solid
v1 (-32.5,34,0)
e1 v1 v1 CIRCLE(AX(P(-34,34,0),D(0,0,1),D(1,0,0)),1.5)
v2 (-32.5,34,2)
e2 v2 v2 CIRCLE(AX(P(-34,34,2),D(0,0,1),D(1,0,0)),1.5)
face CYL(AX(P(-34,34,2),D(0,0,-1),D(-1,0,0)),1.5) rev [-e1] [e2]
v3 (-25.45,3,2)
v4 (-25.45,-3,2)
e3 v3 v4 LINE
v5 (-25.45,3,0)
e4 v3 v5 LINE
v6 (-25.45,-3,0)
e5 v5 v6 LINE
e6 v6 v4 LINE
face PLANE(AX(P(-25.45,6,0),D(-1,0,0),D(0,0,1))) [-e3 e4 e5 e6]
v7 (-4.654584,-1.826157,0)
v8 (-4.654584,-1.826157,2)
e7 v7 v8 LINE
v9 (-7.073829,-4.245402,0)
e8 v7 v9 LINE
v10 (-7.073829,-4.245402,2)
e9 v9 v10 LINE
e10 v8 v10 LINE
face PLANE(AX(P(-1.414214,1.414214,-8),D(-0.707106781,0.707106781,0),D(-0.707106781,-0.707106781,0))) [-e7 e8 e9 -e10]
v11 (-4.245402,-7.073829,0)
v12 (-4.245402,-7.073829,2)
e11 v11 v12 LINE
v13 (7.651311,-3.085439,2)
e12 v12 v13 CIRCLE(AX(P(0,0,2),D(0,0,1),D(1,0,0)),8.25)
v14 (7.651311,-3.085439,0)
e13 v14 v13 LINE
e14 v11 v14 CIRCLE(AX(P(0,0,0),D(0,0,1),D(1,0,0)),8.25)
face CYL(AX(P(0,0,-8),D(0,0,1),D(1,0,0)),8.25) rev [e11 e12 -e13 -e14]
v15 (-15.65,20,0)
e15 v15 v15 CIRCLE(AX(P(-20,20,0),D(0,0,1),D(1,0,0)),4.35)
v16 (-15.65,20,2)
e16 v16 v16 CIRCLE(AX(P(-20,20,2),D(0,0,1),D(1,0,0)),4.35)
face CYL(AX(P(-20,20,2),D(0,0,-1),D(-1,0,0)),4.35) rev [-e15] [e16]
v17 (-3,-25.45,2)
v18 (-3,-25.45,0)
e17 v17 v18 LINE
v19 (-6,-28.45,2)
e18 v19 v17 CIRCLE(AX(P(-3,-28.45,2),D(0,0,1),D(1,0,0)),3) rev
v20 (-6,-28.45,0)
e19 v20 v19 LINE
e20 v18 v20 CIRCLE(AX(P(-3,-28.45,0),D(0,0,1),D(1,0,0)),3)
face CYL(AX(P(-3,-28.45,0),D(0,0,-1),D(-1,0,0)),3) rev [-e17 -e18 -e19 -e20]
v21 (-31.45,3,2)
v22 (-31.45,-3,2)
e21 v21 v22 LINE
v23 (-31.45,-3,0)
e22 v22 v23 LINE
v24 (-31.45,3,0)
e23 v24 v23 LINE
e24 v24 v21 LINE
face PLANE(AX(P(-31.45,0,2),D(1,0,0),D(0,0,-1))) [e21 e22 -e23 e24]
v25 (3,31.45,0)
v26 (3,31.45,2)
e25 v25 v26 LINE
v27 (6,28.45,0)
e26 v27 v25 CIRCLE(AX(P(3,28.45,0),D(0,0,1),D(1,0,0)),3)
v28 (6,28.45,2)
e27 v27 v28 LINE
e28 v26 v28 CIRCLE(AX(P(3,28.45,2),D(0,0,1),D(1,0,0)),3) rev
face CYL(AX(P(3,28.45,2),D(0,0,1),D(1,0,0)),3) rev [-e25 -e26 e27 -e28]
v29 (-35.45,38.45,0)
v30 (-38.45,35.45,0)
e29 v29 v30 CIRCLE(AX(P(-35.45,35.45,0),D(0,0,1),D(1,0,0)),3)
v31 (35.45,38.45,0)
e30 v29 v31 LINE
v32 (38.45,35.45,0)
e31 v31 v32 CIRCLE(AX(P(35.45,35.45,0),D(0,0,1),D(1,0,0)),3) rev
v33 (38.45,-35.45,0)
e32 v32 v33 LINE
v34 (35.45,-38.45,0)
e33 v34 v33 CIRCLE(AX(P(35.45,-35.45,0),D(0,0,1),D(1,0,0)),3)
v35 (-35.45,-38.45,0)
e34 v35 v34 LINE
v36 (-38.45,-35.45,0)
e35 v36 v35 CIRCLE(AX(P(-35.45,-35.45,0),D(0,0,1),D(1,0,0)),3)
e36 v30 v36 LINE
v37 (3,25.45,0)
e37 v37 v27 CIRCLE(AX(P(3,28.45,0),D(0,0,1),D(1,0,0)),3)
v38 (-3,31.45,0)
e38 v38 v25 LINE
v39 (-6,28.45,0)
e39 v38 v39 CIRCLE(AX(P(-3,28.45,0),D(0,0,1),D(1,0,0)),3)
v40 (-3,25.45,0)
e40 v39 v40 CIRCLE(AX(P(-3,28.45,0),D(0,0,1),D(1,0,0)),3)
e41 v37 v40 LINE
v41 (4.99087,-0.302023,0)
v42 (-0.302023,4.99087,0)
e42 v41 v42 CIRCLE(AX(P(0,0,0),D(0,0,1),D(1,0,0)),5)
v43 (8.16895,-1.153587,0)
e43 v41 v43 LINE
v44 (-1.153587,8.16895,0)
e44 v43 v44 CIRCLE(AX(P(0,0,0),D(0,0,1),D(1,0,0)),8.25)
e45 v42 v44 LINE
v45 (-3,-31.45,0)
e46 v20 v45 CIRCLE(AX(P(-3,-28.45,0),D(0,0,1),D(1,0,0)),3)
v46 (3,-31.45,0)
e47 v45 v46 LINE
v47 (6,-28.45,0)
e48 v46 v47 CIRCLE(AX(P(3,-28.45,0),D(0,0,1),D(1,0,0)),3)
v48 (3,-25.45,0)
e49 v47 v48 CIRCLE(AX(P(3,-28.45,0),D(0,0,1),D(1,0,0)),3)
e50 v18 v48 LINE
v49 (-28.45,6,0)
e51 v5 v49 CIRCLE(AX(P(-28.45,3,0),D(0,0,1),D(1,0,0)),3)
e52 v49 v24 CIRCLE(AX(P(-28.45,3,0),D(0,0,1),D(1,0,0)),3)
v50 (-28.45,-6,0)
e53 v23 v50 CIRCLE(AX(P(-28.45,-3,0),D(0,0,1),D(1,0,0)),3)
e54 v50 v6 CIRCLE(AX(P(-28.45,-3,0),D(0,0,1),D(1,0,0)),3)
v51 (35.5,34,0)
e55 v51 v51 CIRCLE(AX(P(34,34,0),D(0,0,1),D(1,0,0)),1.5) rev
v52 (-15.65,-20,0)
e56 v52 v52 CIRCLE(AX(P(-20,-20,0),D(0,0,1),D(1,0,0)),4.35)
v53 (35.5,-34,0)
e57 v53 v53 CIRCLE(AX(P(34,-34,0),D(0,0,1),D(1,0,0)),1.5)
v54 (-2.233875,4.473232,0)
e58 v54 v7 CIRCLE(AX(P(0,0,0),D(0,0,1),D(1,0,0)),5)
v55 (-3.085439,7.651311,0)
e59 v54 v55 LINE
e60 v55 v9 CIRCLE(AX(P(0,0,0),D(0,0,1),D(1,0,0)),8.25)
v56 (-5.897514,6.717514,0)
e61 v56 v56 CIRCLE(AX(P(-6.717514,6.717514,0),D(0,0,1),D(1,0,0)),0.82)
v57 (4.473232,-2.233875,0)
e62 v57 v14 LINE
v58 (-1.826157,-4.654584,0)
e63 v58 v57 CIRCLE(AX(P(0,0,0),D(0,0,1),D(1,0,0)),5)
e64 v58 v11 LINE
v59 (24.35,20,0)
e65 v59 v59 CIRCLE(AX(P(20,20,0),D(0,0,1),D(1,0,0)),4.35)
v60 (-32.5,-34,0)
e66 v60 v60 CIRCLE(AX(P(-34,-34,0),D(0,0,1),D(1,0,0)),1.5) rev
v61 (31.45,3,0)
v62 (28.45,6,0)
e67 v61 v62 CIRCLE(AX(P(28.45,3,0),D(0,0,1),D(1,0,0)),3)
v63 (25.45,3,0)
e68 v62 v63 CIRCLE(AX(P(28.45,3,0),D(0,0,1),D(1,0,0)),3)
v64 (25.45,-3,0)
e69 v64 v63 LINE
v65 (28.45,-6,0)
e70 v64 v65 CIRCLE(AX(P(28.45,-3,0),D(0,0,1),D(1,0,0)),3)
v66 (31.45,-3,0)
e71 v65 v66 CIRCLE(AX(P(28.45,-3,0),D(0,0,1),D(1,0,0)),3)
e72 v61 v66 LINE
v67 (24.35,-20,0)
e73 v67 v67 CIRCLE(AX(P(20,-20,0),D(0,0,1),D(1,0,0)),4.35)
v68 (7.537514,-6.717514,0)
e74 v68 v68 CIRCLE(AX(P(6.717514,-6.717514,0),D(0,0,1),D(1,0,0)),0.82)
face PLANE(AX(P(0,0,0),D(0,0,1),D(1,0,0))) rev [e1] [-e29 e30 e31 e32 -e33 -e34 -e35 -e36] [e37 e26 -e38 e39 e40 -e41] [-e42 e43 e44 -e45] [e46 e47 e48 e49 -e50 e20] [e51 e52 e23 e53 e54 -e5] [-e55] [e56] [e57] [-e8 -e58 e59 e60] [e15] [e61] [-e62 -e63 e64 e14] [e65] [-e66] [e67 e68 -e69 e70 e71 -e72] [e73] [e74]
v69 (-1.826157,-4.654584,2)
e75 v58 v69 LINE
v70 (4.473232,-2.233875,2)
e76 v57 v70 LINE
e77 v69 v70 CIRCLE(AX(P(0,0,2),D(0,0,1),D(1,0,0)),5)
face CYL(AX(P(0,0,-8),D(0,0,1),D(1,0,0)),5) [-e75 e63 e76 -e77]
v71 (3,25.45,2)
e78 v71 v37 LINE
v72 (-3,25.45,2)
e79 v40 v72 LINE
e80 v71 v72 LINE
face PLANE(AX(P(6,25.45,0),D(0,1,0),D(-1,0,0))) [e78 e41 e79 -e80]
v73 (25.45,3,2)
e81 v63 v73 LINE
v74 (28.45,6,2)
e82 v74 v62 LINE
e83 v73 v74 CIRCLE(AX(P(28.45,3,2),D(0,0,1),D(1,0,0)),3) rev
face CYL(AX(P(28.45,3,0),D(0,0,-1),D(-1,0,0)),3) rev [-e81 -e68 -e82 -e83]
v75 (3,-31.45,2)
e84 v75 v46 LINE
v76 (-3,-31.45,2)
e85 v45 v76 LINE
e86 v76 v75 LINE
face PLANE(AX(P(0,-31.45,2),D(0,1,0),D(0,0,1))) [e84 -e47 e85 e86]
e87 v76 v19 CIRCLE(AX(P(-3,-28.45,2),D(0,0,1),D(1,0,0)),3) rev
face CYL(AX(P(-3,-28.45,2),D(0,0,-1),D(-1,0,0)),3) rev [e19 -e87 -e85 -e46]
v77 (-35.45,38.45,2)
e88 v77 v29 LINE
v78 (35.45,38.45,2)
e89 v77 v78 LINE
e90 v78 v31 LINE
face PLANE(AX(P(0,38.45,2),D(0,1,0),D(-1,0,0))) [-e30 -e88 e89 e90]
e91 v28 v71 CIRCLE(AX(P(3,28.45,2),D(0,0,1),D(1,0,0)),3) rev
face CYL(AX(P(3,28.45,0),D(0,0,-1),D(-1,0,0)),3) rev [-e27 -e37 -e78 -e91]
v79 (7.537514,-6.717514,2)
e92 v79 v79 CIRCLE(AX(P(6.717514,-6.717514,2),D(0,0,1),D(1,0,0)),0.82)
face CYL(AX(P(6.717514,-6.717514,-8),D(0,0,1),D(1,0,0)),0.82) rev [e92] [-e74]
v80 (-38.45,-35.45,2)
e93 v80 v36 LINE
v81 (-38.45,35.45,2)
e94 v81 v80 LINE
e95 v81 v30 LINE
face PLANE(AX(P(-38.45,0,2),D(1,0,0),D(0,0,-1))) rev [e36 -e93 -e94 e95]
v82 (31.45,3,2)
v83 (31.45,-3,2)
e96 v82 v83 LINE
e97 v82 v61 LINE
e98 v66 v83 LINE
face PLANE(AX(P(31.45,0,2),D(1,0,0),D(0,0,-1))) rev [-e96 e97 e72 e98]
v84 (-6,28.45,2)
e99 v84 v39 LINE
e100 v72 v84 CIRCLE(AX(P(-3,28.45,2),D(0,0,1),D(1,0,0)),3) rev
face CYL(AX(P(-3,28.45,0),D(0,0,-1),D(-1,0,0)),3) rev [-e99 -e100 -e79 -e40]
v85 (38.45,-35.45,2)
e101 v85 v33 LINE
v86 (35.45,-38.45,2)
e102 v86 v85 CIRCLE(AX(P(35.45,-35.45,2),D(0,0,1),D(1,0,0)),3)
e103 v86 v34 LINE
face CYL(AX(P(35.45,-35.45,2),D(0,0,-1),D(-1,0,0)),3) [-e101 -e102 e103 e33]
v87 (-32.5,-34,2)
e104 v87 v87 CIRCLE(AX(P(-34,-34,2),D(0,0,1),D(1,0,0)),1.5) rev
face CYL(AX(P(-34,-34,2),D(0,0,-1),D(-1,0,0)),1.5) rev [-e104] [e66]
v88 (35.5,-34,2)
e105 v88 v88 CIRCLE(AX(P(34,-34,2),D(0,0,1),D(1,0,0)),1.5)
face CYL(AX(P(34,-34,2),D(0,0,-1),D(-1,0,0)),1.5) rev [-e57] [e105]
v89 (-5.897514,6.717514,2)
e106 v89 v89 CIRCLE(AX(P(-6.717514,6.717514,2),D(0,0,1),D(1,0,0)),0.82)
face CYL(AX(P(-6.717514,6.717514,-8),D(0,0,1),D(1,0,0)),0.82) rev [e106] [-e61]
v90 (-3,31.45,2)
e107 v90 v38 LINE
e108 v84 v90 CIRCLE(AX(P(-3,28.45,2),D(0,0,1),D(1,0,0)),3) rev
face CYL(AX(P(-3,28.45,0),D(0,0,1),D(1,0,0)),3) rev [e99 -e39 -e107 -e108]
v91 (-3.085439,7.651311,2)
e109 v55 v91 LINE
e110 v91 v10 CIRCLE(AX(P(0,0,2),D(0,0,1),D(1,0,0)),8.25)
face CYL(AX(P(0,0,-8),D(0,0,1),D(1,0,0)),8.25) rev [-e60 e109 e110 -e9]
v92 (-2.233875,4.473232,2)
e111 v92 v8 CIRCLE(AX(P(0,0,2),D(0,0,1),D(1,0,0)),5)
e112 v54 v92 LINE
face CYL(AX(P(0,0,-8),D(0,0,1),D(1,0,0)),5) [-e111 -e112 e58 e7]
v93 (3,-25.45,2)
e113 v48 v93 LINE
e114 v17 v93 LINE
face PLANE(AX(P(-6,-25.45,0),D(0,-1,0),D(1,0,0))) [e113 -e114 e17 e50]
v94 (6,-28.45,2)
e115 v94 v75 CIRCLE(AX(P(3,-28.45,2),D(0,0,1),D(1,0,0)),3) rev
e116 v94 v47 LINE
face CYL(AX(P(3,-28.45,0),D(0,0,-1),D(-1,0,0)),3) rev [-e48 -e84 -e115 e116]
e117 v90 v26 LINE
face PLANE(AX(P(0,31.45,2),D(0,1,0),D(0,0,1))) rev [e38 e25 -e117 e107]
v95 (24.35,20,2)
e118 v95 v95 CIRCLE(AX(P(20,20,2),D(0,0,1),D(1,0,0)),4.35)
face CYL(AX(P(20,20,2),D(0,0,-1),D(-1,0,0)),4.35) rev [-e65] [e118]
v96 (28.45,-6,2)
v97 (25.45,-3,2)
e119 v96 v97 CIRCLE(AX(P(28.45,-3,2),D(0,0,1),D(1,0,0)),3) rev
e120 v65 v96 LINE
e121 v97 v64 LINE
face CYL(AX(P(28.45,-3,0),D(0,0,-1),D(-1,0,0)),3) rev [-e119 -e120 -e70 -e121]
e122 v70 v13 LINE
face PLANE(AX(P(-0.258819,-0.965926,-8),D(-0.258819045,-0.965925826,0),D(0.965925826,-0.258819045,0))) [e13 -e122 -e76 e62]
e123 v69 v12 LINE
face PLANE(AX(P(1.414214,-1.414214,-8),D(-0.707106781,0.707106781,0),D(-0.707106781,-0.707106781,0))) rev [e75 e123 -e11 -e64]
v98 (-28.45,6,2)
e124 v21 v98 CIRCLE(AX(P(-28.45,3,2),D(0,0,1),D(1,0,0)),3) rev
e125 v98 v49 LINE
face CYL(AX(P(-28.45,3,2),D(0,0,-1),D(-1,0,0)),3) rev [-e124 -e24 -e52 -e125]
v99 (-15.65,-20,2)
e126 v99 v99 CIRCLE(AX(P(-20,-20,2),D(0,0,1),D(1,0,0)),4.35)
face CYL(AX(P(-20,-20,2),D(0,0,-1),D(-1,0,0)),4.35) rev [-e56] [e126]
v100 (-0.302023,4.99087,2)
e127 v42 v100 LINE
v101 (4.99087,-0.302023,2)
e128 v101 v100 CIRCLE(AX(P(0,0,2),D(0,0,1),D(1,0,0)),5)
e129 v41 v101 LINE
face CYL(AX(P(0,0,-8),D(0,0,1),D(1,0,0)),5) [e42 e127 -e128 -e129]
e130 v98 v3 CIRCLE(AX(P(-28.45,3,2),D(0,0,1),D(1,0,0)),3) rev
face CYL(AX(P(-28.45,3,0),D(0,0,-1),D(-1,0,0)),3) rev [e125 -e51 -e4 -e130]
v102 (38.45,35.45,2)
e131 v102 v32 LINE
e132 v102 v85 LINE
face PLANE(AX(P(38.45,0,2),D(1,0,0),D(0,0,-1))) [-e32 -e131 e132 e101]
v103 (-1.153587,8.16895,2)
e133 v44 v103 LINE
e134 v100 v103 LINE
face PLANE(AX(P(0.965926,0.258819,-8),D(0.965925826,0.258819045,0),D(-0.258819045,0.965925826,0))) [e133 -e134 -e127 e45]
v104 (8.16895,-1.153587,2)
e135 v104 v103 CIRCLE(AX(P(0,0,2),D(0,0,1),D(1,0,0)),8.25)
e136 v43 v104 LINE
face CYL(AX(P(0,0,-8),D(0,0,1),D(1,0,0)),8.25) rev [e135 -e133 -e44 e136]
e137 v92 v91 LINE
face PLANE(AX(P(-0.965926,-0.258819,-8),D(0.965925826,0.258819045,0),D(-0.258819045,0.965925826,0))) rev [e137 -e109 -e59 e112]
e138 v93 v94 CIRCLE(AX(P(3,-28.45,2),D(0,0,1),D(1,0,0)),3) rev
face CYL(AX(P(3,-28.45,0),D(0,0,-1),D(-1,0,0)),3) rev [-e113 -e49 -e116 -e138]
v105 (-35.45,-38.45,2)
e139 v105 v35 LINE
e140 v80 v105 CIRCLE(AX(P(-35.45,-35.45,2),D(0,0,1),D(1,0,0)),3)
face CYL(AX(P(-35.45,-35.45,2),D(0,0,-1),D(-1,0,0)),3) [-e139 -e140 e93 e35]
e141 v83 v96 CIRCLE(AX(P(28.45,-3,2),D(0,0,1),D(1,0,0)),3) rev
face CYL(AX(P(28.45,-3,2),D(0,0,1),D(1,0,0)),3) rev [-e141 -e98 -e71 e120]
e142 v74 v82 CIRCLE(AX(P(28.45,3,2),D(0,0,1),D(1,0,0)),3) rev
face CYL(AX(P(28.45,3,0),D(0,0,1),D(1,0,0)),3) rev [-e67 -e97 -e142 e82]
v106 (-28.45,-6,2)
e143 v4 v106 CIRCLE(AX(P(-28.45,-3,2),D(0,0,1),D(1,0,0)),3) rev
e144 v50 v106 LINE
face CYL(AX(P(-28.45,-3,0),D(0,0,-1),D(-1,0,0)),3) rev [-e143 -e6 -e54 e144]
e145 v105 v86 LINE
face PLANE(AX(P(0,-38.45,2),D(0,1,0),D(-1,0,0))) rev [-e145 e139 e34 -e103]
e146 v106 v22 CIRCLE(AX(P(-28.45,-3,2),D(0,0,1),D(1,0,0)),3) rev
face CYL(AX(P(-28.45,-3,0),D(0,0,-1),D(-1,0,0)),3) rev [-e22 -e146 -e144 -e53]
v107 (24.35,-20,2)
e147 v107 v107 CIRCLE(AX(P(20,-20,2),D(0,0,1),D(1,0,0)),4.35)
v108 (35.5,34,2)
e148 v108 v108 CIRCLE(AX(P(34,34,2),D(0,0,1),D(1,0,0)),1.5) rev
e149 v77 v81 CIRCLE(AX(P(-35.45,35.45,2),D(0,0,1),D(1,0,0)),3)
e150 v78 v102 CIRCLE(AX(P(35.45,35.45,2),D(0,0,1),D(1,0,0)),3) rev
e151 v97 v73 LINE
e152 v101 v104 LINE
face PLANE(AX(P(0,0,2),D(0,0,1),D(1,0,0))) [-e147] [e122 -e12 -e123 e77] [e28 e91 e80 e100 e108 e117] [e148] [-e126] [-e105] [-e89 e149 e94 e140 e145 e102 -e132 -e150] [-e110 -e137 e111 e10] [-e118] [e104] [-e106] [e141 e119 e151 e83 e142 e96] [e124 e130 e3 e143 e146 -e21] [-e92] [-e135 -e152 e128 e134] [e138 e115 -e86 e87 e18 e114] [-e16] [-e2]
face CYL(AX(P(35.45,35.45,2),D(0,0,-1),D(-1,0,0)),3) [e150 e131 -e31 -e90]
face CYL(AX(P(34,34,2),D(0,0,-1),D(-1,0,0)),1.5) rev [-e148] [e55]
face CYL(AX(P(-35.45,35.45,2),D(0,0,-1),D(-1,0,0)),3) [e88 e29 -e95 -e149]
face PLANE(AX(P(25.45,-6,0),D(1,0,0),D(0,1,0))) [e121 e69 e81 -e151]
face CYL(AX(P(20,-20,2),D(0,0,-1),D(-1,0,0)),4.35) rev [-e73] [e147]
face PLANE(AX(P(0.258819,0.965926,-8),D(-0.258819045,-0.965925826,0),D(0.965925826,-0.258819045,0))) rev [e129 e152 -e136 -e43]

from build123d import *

# Parameters (mm, degrees)
SKETCH_1_R          = 1.5
SKETCH_1_R_2        = 4.35
EXTRUDE_1_DEPTH     = 2
SKETCH_3_R          = 0.82
CUT_EXTRUDE_2_DEPTH = 10
EXTRUDE_START       = -2
EXTRUDE_2_DEPTH     = 2
FILLET_1_R          = 3


with BuildPart() as part:
    # 草圖1 → 填料-伸長1 (new body)
    with BuildSketch(Plane.XY):
        with BuildLine():
            Line((-35.45, 38.45), (35.45, 38.45))
            ThreePointArc((35.45, 38.45), (37.571320344, 37.571320344), (38.45, 35.45))
            Line((38.45, 35.45), (38.45, -35.45))
            ThreePointArc((38.45, -35.45), (37.571320344, -37.571320344), (35.45, -38.45))
            Line((35.45, -38.45), (-35.45, -38.45))
            ThreePointArc((-35.45, -38.45), (-37.571320344, -37.571320344), (-38.45, -35.45))
            Line((-38.45, -35.45), (-38.45, 35.45))
            ThreePointArc((-38.45, 35.45), (-37.571320344, 37.571320344), (-35.45, 38.45))
        make_face()
        with Locations((-34, 34)):
            Circle(SKETCH_1_R, mode=Mode.SUBTRACT)
        with Locations((34, 34)):
            Circle(SKETCH_1_R, mode=Mode.SUBTRACT)
        with Locations((34, -34)):
            Circle(SKETCH_1_R, mode=Mode.SUBTRACT)
        with Locations((-34, -34)):
            Circle(SKETCH_1_R, mode=Mode.SUBTRACT)
        with Locations((-20, 20)):
            Circle(SKETCH_1_R_2, mode=Mode.SUBTRACT)
        with Locations((20, 20)):
            Circle(SKETCH_1_R_2, mode=Mode.SUBTRACT)
        with Locations((-20, -20)):
            Circle(SKETCH_1_R_2, mode=Mode.SUBTRACT)
        with Locations((20, -20)):
            Circle(SKETCH_1_R_2, mode=Mode.SUBTRACT)
        with BuildLine():
            Line((-18.5, 31.45), (18.5, 31.45))
            Line((18.5, 31.45), (18.5, 26.837397166))
            ThreePointArc((18.5, 26.837397166), (15.050252532, 24.949747468), (13.162602834, 21.5))
            Line((13.162602834, 21.5), (-13.162602834, 21.5))
            ThreePointArc((-13.162602834, 21.5), (-15.050252532, 24.949747468), (-18.5, 26.837397166))
            Line((-18.5, 26.837397166), (-18.5, 31.45))
        make_face(mode=Mode.SUBTRACT)
        with BuildLine():
            Line((-31.45, 18.5), (-31.45, -18.5))
            Line((-31.45, -18.5), (-26.837397166, -18.5))
            ThreePointArc((-26.837397166, -18.5), (-24.949747468, -15.050252532), (-21.5, -13.162602834))
            Line((-21.5, -13.162602834), (-21.5, 13.162602834))
            ThreePointArc((-21.5, 13.162602834), (-24.949747468, 15.050252532), (-26.837397166, 18.5))
            Line((-26.837397166, 18.5), (-31.45, 18.5))
        make_face(mode=Mode.SUBTRACT)
        with BuildLine():
            Line((26.837397166, 18.5), (31.45, 18.5))
            Line((31.45, 18.5), (31.45, -18.5))
            Line((31.45, -18.5), (26.837397166, -18.5))
            ThreePointArc((26.837397166, -18.5), (24.949747468, -15.050252532), (21.5, -13.162602834))
            Line((21.5, -13.162602834), (21.5, 13.162602834))
            ThreePointArc((21.5, 13.162602834), (24.949747468, 15.050252532), (26.837397166, 18.5))
        make_face(mode=Mode.SUBTRACT)
        with BuildLine():
            Line((-18.5, -31.45), (-18.5, -26.837397166))
            ThreePointArc((-18.5, -26.837397166), (-15.050252532, -24.949747468), (-13.162602834, -21.5))
            Line((-13.162602834, -21.5), (13.162602834, -21.5))
            ThreePointArc((13.162602834, -21.5), (15.050252532, -24.949747468), (18.5, -26.837397166))
            Line((18.5, -26.837397166), (18.5, -31.45))
            Line((18.5, -31.45), (-18.5, -31.45))
        make_face(mode=Mode.SUBTRACT)
    extrude(amount=EXTRUDE_1_DEPTH)

    # 草圖3 → 除料-伸長2 (cut)
    with BuildSketch(Plane.XY.offset(2)):
        with BuildLine():
            Line((-7.073829274, -4.245402149), (-4.654583912, -1.826156787))
            ThreePointArc((-4.654583912, -1.826156787), (-4.667257292, 1.793518711), (-2.233875019, 4.473231762))
            Line((-2.233875019, 4.473231762), (-3.085438902, 7.651311442))
            ThreePointArc((-3.085438902, 7.651311442), (-7.822124458, 2.622378494), (-7.073829274, -4.245402149))
        make_face()
        with BuildLine():
            Line((-1.15358725, 8.168949532), (-0.302023366, 4.990869853))
            ThreePointArc((-0.302023366, 4.990869853), (3.427089375, 3.640749705), (5, 0))
            ThreePointArc((5, 0), (4.997716942, -0.151080668), (4.990869853, -0.302023366))
            Line((4.990869853, -0.302023366), (8.168949532, -1.15358725))
            ThreePointArc((8.168949532, -1.15358725), (8.229712438, -0.578215514), (8.25, 0))
            ThreePointArc((8.25, 0), (5.410425362, 6.228145583), (-1.15358725, 8.168949532))
        make_face()
        with BuildLine():
            ThreePointArc((4.473231762, -2.233875019), (1.793518711, -4.667257292), (-1.826156787, -4.654583912))
            Line((-1.826156787, -4.654583912), (-4.245402149, -7.073829274))
            ThreePointArc((-4.245402149, -7.073829274), (2.622378494, -7.822124458), (7.651311442, -3.085438902))
            Line((7.651311442, -3.085438902), (4.473231762, -2.233875019))
        make_face()
        with Locations((6.717514421, -6.717514421)):
            Circle(SKETCH_3_R)
        with Locations((-6.717514421, 6.717514421)):
            Circle(SKETCH_3_R)
    extrude(amount=-CUT_EXTRUDE_2_DEPTH, mode=Mode.SUBTRACT)

    # 草圖4 → 填料-伸長2 (add)
    with BuildSketch(Plane.XY.offset(2).offset(EXTRUDE_START)):
        with BuildLine():
            Line((-31.45, -6), (-31.45, -18.5))
            Line((-31.45, -18.5), (-26.837397166, -18.5))
            ThreePointArc((-26.837397166, -18.5), (-24.949747468, -15.050252532), (-21.5, -13.162602834))
            Line((-21.5, -13.162602834), (-21.5, 13.162602834))
            ThreePointArc((-21.5, 13.162602834), (-24.949747468, 15.050252532), (-26.837397166, 18.5))
            Line((-26.837397166, 18.5), (-31.45, 18.5))
            Line((-31.45, 18.5), (-31.45, 6))
            Line((-31.45, 6), (-25.45, 6))
            Line((-25.45, 6), (-25.45, -6))
            Line((-25.45, -6), (-31.45, -6))
        make_face()
        with BuildLine():
            Line((-6, 31.45), (-18.5, 31.45))
            Line((-18.5, 31.45), (-18.5, 26.837397166))
            ThreePointArc((-18.5, 26.837397166), (-15.050252532, 24.949747468), (-13.162602834, 21.5))
            Line((-13.162602834, 21.5), (13.162602834, 21.5))
            ThreePointArc((13.162602834, 21.5), (15.050252532, 24.949747468), (18.5, 26.837397166))
            Line((18.5, 26.837397166), (18.5, 31.45))
            Line((18.5, 31.45), (6, 31.45))
            Line((6, 31.45), (6, 25.45))
            Line((6, 25.45), (-6, 25.45))
            Line((-6, 25.45), (-6, 31.45))
        make_face()
        with BuildLine():
            Line((31.45, 6), (31.45, 18.5))
            Line((31.45, 18.5), (26.837397166, 18.5))
            ThreePointArc((26.837397166, 18.5), (24.949747468, 15.050252532), (21.5, 13.162602834))
            Line((21.5, 13.162602834), (21.5, -13.162602834))
            ThreePointArc((21.5, -13.162602834), (24.949747468, -15.050252532), (26.837397166, -18.5))
            Line((26.837397166, -18.5), (31.45, -18.5))
            Line((31.45, -18.5), (31.45, -6))
            Line((31.45, -6), (25.45, -6))
            Line((25.45, -6), (25.45, 6))
            Line((25.45, 6), (31.45, 6))
        make_face()
        with BuildLine():
            Line((6, -31.45), (18.5, -31.45))
            Line((18.5, -31.45), (18.5, -26.837397166))
            ThreePointArc((18.5, -26.837397166), (15.050252532, -24.949747468), (13.162602834, -21.5))
            Line((13.162602834, -21.5), (-13.162602834, -21.5))
            ThreePointArc((-13.162602834, -21.5), (-15.050252532, -24.949747468), (-18.5, -26.837397166))
            Line((-18.5, -26.837397166), (-18.5, -31.45))
            Line((-18.5, -31.45), (-6, -31.45))
            Line((-6, -31.45), (-6, -25.45))
            Line((-6, -25.45), (6, -25.45))
            Line((6, -25.45), (6, -31.45))
        make_face()
    extrude(amount=EXTRUDE_2_DEPTH)

    # 圓角1
    fillet_1_edges = [part.edges().sort_by_distance(p)[0] for p in [
        (-25.45, -6, 1),
        (-31.45, -6, 1),
        (-25.45, 6, 1),
        (-31.45, 6, 1),
        (6, 31.45, 1),
        (6, 25.45, 1),
        (-6, 31.45, 1),
        (-6, 25.45, 1),
        (31.45, 6, 1),
        (25.45, 6, 1),
        (31.45, -6, 1),
        (25.45, -6, 1),
        (-6, -31.45, 1),
        (-6, -25.45, 1),
        (6, -31.45, 1),
        (6, -25.45, 1),
    ]]
    fillet(fillet_1_edges, radius=FILLET_1_R - 0.0001)  # a hair under: the kernel refuses the full size


solid = part.part
